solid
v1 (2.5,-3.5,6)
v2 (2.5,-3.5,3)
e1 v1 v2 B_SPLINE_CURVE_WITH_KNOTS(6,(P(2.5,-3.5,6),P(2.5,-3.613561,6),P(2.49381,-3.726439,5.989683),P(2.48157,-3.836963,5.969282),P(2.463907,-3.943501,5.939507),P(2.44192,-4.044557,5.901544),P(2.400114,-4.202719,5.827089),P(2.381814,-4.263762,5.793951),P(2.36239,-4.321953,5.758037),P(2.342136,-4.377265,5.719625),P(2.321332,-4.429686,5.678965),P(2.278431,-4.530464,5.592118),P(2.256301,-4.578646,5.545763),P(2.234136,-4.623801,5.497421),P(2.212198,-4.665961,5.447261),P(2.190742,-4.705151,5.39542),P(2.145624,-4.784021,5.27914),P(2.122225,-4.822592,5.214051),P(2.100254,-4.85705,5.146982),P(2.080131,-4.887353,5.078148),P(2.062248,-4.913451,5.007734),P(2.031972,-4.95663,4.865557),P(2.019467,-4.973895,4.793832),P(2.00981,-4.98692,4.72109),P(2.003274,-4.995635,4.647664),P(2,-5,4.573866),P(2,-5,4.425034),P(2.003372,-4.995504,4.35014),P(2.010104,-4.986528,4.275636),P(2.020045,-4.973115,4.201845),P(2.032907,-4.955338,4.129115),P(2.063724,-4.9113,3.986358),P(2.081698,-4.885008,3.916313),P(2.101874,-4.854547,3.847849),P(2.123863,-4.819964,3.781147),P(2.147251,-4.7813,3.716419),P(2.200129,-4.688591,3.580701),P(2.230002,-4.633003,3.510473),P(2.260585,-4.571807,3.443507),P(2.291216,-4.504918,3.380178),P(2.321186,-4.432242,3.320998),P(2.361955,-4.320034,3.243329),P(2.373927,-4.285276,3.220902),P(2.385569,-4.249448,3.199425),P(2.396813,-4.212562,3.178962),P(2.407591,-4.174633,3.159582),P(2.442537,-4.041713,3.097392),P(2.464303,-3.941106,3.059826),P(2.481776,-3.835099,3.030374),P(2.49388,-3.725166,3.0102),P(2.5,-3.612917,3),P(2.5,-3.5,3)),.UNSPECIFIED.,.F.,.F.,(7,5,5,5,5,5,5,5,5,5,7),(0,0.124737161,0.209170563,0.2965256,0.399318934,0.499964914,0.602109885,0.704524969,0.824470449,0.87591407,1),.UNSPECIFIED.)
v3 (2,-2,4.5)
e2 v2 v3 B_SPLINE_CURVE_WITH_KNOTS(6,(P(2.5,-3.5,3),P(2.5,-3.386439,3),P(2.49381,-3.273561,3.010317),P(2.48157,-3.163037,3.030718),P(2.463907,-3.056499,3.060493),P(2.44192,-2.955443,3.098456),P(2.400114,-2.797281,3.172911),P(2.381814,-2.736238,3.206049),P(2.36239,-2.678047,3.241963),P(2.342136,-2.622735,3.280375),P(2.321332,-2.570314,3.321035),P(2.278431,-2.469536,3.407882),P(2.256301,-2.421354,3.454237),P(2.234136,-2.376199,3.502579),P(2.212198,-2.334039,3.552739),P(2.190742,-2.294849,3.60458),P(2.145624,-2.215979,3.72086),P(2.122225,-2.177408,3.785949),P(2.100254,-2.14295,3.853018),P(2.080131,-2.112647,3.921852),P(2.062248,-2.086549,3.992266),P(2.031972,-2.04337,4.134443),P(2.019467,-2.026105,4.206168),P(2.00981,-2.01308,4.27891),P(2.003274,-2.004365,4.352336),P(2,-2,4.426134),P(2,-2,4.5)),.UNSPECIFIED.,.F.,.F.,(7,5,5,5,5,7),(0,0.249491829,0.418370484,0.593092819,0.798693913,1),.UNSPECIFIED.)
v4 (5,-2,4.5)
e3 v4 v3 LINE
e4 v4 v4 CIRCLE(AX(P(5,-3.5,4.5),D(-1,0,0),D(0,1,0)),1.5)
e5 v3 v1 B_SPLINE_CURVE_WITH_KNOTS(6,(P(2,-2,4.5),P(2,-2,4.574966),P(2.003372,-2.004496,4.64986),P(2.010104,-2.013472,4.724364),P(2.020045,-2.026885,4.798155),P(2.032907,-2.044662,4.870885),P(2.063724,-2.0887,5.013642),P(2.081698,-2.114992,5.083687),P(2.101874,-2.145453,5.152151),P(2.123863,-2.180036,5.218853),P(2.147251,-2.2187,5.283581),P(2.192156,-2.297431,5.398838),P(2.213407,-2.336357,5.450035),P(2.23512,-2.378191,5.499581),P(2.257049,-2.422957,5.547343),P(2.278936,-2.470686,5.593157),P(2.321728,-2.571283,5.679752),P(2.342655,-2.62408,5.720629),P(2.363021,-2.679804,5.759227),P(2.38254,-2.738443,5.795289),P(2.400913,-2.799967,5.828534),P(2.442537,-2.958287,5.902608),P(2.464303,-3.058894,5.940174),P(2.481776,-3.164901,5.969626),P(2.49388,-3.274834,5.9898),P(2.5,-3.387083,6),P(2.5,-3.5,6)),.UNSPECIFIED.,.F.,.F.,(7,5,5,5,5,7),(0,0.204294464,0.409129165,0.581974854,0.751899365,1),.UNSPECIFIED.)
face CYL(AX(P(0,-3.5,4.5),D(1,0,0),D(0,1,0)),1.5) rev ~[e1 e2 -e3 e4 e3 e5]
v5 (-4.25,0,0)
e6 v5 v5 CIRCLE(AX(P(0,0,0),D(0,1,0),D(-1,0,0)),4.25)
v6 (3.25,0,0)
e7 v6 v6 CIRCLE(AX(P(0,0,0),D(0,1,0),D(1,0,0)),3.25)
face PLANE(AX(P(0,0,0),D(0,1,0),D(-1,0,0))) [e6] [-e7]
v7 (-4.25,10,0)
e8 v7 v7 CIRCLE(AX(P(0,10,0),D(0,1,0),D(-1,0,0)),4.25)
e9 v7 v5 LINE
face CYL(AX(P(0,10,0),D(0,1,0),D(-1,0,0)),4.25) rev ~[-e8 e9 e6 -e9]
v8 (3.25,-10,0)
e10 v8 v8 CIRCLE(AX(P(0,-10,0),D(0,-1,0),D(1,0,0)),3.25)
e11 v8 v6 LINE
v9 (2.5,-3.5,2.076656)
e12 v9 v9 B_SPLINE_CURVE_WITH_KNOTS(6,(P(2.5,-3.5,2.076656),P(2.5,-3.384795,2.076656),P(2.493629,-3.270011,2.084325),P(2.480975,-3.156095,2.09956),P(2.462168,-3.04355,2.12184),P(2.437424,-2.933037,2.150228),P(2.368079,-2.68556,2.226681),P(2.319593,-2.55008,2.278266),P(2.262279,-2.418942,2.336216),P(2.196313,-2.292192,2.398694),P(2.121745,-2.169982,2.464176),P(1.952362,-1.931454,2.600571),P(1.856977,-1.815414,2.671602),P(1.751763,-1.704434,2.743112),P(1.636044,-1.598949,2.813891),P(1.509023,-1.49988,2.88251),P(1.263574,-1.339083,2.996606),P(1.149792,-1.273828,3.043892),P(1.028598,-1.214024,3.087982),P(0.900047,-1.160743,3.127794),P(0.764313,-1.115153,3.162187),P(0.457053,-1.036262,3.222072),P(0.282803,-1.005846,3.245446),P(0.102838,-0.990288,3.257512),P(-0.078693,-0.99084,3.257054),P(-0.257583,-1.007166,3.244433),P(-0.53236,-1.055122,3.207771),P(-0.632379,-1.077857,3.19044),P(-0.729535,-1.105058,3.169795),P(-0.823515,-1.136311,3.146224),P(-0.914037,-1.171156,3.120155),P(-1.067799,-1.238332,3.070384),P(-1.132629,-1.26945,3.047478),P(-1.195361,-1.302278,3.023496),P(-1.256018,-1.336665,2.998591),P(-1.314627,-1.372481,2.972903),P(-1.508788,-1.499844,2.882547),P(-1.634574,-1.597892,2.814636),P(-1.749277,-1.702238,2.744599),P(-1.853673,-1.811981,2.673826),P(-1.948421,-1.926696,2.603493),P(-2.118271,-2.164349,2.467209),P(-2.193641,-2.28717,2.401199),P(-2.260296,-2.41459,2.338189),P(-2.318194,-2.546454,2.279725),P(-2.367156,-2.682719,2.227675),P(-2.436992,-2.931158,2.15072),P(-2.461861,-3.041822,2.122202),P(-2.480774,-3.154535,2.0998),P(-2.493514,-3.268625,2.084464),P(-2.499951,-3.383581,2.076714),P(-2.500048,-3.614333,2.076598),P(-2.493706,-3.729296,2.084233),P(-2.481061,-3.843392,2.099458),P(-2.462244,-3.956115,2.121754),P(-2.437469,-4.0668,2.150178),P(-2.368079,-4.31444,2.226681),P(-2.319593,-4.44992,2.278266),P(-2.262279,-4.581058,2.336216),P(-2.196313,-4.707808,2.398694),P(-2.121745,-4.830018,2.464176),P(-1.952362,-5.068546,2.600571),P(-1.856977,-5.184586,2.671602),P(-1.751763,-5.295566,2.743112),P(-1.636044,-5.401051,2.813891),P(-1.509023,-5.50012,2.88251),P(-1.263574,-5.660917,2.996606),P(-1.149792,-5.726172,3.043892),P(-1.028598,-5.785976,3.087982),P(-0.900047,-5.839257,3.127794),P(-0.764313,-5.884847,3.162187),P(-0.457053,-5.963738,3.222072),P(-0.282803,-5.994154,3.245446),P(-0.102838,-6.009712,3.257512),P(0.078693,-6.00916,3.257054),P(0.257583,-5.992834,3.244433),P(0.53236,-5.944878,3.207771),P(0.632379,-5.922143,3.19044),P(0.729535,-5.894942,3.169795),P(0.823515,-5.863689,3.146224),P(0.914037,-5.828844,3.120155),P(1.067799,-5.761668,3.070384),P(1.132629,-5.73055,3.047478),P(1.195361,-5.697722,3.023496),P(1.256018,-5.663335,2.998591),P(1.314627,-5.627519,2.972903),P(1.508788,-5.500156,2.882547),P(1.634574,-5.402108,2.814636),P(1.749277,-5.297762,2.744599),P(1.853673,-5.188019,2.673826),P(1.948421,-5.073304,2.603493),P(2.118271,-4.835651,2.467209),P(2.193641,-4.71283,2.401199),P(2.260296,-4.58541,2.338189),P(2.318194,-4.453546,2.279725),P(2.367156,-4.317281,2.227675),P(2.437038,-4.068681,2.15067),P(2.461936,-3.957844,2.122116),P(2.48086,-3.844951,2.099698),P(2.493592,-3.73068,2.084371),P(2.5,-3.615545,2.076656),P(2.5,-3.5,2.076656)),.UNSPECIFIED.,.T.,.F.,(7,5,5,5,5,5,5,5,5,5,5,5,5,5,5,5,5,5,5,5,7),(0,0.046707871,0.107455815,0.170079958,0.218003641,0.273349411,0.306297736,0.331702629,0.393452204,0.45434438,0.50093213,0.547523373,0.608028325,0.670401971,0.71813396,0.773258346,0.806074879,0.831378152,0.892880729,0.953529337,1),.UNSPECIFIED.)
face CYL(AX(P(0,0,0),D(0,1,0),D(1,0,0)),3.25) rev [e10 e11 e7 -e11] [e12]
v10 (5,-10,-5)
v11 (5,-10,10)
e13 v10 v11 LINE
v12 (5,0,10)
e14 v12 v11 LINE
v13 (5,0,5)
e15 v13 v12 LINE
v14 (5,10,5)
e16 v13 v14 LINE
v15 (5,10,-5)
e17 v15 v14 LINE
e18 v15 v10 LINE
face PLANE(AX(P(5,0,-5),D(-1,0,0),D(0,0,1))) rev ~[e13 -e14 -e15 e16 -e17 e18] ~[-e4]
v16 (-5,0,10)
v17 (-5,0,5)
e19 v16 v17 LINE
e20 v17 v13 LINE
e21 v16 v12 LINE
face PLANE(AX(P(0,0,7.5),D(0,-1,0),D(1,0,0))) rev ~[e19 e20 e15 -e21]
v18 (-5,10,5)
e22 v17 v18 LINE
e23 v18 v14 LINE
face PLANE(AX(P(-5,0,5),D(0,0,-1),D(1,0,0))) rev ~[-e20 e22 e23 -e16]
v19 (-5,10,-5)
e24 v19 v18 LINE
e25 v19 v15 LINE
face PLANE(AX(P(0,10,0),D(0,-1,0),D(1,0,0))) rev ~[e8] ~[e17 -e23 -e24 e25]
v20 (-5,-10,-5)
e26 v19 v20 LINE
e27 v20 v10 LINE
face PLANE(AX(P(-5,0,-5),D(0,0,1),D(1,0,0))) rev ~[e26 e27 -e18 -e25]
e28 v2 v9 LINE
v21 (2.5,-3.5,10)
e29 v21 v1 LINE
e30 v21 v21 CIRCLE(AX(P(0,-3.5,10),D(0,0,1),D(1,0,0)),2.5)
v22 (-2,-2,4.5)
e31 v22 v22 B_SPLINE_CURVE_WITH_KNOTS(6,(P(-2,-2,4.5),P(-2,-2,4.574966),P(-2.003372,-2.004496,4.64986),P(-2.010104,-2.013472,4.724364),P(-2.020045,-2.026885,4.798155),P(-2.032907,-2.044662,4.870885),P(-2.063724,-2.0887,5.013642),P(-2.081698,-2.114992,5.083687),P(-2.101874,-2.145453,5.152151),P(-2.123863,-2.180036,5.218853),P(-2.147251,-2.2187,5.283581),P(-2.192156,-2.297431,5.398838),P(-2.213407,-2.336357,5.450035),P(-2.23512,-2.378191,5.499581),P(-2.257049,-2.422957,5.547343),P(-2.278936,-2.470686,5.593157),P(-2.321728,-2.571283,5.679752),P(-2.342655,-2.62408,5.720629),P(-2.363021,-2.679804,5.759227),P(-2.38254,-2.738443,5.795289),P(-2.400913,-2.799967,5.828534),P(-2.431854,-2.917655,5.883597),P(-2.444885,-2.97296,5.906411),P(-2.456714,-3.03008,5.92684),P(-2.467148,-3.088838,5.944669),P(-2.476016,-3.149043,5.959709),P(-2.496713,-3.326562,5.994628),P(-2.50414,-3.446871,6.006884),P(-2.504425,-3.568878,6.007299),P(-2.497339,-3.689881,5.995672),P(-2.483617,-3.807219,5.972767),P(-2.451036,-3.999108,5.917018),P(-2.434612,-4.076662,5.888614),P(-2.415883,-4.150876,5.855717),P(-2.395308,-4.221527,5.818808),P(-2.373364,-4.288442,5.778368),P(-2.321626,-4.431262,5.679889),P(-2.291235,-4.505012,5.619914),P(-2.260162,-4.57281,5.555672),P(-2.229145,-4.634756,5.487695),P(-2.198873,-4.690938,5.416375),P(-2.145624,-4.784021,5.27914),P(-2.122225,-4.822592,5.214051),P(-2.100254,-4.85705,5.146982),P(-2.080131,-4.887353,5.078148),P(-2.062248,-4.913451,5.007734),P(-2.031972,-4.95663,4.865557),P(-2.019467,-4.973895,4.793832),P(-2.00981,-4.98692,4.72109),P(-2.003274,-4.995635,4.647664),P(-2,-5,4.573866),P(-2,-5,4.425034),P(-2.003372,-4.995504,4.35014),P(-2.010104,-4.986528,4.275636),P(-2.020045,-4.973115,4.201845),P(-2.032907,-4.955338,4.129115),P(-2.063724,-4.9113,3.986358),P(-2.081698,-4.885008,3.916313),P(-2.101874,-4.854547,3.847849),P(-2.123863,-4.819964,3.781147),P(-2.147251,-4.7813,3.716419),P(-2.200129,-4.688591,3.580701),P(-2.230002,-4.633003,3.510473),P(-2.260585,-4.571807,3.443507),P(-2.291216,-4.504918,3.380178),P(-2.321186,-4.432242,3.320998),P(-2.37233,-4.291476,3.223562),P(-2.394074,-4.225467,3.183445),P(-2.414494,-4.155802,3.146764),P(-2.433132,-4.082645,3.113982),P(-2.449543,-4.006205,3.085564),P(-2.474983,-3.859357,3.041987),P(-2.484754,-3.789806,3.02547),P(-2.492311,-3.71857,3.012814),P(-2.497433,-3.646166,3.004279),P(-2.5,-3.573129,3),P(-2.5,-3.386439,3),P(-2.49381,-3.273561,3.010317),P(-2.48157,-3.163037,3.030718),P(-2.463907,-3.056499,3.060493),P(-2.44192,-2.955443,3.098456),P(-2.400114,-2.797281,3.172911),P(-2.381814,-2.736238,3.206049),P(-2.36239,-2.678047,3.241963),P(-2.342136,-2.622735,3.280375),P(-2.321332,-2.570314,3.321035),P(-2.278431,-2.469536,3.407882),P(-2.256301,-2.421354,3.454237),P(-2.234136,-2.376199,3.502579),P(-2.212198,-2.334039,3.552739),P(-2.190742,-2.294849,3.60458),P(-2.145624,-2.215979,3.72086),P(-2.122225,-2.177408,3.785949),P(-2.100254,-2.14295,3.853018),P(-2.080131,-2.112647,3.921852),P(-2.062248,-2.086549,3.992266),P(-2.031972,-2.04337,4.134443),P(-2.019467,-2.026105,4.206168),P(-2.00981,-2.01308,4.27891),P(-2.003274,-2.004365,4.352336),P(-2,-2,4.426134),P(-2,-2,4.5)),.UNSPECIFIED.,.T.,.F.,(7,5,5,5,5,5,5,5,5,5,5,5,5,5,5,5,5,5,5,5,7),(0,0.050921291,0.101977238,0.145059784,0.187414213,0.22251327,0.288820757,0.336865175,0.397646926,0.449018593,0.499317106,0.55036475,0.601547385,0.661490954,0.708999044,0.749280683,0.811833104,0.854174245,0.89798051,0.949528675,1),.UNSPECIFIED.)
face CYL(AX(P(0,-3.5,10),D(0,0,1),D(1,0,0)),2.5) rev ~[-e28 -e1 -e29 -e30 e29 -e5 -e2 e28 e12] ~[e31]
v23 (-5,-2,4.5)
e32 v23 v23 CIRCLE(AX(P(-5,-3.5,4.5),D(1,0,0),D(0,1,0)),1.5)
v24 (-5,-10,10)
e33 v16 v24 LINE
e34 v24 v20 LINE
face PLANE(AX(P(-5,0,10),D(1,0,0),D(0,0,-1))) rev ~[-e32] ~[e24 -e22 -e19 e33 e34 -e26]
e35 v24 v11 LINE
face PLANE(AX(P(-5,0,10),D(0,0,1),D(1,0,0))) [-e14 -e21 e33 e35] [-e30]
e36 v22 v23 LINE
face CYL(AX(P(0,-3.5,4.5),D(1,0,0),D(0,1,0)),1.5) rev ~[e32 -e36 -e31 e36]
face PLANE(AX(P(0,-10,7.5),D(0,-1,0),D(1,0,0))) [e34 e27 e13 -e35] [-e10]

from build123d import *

# Parameters (mm, degrees)
F0_W          = 10
F0_H          = 10
F0_R          = 3.25
F1_DEPTH      = 10
F0_H_2        = 5
F2_DEPTH      = 10
F3_R          = 4.25
F3_R_2        = 3.25
F4_DEPTH      = 10
F5_R          = 1.5
F6_DEPTH      = 5.001
F6_DEPTH_BACK = 5.001
F7_R          = 2.5
F8_DEPTH      = 10


with BuildPart() as f1:
    # F0 (on Front) → F1 (new body)
    with BuildSketch(Plane.XZ):
        Rectangle(F0_W, F0_H)
        Circle(F0_R, mode=Mode.SUBTRACT)
    extrude(amount=-F1_DEPTH)

    # F0 (on Front) → F2 (join)
    with BuildSketch(Plane.XZ):
        with Locations((0, 7.5)):
            Rectangle(F0_W, F0_H_2)
        Rectangle(F0_W, F0_H)
        Circle(F0_R, mode=Mode.SUBTRACT)
    extrude(amount=F2_DEPTH)

    # F3 (on face) → F4 (cut)
    with BuildSketch(Plane(origin=(0, 10, 0), x_dir=(-1, 0, 0), z_dir=(0, 1, 0))):
        Circle(F3_R)
        Circle(F3_R_2, mode=Mode.SUBTRACT)
        Circle(F3_R_2)
    extrude(amount=-F4_DEPTH, mode=Mode.SUBTRACT)

    # F5 (on Right) → F6 (cut, two sides)
    with BuildSketch(Plane.YZ) as f6_sk:
        with Locations((-3.5, 4.5)):
            Circle(F5_R)
    extrude(amount=-F6_DEPTH, mode=Mode.SUBTRACT)
    extrude(f6_sk.sketch, amount=F6_DEPTH_BACK, mode=Mode.SUBTRACT)

    # F7 (on face) → F8 (cut)
    with BuildSketch(Plane.XY.offset(10)):
        with Locations((0, -3.5)):
            Circle(F7_R)
    extrude(amount=-F8_DEPTH, mode=Mode.SUBTRACT)


solid = f1.part
